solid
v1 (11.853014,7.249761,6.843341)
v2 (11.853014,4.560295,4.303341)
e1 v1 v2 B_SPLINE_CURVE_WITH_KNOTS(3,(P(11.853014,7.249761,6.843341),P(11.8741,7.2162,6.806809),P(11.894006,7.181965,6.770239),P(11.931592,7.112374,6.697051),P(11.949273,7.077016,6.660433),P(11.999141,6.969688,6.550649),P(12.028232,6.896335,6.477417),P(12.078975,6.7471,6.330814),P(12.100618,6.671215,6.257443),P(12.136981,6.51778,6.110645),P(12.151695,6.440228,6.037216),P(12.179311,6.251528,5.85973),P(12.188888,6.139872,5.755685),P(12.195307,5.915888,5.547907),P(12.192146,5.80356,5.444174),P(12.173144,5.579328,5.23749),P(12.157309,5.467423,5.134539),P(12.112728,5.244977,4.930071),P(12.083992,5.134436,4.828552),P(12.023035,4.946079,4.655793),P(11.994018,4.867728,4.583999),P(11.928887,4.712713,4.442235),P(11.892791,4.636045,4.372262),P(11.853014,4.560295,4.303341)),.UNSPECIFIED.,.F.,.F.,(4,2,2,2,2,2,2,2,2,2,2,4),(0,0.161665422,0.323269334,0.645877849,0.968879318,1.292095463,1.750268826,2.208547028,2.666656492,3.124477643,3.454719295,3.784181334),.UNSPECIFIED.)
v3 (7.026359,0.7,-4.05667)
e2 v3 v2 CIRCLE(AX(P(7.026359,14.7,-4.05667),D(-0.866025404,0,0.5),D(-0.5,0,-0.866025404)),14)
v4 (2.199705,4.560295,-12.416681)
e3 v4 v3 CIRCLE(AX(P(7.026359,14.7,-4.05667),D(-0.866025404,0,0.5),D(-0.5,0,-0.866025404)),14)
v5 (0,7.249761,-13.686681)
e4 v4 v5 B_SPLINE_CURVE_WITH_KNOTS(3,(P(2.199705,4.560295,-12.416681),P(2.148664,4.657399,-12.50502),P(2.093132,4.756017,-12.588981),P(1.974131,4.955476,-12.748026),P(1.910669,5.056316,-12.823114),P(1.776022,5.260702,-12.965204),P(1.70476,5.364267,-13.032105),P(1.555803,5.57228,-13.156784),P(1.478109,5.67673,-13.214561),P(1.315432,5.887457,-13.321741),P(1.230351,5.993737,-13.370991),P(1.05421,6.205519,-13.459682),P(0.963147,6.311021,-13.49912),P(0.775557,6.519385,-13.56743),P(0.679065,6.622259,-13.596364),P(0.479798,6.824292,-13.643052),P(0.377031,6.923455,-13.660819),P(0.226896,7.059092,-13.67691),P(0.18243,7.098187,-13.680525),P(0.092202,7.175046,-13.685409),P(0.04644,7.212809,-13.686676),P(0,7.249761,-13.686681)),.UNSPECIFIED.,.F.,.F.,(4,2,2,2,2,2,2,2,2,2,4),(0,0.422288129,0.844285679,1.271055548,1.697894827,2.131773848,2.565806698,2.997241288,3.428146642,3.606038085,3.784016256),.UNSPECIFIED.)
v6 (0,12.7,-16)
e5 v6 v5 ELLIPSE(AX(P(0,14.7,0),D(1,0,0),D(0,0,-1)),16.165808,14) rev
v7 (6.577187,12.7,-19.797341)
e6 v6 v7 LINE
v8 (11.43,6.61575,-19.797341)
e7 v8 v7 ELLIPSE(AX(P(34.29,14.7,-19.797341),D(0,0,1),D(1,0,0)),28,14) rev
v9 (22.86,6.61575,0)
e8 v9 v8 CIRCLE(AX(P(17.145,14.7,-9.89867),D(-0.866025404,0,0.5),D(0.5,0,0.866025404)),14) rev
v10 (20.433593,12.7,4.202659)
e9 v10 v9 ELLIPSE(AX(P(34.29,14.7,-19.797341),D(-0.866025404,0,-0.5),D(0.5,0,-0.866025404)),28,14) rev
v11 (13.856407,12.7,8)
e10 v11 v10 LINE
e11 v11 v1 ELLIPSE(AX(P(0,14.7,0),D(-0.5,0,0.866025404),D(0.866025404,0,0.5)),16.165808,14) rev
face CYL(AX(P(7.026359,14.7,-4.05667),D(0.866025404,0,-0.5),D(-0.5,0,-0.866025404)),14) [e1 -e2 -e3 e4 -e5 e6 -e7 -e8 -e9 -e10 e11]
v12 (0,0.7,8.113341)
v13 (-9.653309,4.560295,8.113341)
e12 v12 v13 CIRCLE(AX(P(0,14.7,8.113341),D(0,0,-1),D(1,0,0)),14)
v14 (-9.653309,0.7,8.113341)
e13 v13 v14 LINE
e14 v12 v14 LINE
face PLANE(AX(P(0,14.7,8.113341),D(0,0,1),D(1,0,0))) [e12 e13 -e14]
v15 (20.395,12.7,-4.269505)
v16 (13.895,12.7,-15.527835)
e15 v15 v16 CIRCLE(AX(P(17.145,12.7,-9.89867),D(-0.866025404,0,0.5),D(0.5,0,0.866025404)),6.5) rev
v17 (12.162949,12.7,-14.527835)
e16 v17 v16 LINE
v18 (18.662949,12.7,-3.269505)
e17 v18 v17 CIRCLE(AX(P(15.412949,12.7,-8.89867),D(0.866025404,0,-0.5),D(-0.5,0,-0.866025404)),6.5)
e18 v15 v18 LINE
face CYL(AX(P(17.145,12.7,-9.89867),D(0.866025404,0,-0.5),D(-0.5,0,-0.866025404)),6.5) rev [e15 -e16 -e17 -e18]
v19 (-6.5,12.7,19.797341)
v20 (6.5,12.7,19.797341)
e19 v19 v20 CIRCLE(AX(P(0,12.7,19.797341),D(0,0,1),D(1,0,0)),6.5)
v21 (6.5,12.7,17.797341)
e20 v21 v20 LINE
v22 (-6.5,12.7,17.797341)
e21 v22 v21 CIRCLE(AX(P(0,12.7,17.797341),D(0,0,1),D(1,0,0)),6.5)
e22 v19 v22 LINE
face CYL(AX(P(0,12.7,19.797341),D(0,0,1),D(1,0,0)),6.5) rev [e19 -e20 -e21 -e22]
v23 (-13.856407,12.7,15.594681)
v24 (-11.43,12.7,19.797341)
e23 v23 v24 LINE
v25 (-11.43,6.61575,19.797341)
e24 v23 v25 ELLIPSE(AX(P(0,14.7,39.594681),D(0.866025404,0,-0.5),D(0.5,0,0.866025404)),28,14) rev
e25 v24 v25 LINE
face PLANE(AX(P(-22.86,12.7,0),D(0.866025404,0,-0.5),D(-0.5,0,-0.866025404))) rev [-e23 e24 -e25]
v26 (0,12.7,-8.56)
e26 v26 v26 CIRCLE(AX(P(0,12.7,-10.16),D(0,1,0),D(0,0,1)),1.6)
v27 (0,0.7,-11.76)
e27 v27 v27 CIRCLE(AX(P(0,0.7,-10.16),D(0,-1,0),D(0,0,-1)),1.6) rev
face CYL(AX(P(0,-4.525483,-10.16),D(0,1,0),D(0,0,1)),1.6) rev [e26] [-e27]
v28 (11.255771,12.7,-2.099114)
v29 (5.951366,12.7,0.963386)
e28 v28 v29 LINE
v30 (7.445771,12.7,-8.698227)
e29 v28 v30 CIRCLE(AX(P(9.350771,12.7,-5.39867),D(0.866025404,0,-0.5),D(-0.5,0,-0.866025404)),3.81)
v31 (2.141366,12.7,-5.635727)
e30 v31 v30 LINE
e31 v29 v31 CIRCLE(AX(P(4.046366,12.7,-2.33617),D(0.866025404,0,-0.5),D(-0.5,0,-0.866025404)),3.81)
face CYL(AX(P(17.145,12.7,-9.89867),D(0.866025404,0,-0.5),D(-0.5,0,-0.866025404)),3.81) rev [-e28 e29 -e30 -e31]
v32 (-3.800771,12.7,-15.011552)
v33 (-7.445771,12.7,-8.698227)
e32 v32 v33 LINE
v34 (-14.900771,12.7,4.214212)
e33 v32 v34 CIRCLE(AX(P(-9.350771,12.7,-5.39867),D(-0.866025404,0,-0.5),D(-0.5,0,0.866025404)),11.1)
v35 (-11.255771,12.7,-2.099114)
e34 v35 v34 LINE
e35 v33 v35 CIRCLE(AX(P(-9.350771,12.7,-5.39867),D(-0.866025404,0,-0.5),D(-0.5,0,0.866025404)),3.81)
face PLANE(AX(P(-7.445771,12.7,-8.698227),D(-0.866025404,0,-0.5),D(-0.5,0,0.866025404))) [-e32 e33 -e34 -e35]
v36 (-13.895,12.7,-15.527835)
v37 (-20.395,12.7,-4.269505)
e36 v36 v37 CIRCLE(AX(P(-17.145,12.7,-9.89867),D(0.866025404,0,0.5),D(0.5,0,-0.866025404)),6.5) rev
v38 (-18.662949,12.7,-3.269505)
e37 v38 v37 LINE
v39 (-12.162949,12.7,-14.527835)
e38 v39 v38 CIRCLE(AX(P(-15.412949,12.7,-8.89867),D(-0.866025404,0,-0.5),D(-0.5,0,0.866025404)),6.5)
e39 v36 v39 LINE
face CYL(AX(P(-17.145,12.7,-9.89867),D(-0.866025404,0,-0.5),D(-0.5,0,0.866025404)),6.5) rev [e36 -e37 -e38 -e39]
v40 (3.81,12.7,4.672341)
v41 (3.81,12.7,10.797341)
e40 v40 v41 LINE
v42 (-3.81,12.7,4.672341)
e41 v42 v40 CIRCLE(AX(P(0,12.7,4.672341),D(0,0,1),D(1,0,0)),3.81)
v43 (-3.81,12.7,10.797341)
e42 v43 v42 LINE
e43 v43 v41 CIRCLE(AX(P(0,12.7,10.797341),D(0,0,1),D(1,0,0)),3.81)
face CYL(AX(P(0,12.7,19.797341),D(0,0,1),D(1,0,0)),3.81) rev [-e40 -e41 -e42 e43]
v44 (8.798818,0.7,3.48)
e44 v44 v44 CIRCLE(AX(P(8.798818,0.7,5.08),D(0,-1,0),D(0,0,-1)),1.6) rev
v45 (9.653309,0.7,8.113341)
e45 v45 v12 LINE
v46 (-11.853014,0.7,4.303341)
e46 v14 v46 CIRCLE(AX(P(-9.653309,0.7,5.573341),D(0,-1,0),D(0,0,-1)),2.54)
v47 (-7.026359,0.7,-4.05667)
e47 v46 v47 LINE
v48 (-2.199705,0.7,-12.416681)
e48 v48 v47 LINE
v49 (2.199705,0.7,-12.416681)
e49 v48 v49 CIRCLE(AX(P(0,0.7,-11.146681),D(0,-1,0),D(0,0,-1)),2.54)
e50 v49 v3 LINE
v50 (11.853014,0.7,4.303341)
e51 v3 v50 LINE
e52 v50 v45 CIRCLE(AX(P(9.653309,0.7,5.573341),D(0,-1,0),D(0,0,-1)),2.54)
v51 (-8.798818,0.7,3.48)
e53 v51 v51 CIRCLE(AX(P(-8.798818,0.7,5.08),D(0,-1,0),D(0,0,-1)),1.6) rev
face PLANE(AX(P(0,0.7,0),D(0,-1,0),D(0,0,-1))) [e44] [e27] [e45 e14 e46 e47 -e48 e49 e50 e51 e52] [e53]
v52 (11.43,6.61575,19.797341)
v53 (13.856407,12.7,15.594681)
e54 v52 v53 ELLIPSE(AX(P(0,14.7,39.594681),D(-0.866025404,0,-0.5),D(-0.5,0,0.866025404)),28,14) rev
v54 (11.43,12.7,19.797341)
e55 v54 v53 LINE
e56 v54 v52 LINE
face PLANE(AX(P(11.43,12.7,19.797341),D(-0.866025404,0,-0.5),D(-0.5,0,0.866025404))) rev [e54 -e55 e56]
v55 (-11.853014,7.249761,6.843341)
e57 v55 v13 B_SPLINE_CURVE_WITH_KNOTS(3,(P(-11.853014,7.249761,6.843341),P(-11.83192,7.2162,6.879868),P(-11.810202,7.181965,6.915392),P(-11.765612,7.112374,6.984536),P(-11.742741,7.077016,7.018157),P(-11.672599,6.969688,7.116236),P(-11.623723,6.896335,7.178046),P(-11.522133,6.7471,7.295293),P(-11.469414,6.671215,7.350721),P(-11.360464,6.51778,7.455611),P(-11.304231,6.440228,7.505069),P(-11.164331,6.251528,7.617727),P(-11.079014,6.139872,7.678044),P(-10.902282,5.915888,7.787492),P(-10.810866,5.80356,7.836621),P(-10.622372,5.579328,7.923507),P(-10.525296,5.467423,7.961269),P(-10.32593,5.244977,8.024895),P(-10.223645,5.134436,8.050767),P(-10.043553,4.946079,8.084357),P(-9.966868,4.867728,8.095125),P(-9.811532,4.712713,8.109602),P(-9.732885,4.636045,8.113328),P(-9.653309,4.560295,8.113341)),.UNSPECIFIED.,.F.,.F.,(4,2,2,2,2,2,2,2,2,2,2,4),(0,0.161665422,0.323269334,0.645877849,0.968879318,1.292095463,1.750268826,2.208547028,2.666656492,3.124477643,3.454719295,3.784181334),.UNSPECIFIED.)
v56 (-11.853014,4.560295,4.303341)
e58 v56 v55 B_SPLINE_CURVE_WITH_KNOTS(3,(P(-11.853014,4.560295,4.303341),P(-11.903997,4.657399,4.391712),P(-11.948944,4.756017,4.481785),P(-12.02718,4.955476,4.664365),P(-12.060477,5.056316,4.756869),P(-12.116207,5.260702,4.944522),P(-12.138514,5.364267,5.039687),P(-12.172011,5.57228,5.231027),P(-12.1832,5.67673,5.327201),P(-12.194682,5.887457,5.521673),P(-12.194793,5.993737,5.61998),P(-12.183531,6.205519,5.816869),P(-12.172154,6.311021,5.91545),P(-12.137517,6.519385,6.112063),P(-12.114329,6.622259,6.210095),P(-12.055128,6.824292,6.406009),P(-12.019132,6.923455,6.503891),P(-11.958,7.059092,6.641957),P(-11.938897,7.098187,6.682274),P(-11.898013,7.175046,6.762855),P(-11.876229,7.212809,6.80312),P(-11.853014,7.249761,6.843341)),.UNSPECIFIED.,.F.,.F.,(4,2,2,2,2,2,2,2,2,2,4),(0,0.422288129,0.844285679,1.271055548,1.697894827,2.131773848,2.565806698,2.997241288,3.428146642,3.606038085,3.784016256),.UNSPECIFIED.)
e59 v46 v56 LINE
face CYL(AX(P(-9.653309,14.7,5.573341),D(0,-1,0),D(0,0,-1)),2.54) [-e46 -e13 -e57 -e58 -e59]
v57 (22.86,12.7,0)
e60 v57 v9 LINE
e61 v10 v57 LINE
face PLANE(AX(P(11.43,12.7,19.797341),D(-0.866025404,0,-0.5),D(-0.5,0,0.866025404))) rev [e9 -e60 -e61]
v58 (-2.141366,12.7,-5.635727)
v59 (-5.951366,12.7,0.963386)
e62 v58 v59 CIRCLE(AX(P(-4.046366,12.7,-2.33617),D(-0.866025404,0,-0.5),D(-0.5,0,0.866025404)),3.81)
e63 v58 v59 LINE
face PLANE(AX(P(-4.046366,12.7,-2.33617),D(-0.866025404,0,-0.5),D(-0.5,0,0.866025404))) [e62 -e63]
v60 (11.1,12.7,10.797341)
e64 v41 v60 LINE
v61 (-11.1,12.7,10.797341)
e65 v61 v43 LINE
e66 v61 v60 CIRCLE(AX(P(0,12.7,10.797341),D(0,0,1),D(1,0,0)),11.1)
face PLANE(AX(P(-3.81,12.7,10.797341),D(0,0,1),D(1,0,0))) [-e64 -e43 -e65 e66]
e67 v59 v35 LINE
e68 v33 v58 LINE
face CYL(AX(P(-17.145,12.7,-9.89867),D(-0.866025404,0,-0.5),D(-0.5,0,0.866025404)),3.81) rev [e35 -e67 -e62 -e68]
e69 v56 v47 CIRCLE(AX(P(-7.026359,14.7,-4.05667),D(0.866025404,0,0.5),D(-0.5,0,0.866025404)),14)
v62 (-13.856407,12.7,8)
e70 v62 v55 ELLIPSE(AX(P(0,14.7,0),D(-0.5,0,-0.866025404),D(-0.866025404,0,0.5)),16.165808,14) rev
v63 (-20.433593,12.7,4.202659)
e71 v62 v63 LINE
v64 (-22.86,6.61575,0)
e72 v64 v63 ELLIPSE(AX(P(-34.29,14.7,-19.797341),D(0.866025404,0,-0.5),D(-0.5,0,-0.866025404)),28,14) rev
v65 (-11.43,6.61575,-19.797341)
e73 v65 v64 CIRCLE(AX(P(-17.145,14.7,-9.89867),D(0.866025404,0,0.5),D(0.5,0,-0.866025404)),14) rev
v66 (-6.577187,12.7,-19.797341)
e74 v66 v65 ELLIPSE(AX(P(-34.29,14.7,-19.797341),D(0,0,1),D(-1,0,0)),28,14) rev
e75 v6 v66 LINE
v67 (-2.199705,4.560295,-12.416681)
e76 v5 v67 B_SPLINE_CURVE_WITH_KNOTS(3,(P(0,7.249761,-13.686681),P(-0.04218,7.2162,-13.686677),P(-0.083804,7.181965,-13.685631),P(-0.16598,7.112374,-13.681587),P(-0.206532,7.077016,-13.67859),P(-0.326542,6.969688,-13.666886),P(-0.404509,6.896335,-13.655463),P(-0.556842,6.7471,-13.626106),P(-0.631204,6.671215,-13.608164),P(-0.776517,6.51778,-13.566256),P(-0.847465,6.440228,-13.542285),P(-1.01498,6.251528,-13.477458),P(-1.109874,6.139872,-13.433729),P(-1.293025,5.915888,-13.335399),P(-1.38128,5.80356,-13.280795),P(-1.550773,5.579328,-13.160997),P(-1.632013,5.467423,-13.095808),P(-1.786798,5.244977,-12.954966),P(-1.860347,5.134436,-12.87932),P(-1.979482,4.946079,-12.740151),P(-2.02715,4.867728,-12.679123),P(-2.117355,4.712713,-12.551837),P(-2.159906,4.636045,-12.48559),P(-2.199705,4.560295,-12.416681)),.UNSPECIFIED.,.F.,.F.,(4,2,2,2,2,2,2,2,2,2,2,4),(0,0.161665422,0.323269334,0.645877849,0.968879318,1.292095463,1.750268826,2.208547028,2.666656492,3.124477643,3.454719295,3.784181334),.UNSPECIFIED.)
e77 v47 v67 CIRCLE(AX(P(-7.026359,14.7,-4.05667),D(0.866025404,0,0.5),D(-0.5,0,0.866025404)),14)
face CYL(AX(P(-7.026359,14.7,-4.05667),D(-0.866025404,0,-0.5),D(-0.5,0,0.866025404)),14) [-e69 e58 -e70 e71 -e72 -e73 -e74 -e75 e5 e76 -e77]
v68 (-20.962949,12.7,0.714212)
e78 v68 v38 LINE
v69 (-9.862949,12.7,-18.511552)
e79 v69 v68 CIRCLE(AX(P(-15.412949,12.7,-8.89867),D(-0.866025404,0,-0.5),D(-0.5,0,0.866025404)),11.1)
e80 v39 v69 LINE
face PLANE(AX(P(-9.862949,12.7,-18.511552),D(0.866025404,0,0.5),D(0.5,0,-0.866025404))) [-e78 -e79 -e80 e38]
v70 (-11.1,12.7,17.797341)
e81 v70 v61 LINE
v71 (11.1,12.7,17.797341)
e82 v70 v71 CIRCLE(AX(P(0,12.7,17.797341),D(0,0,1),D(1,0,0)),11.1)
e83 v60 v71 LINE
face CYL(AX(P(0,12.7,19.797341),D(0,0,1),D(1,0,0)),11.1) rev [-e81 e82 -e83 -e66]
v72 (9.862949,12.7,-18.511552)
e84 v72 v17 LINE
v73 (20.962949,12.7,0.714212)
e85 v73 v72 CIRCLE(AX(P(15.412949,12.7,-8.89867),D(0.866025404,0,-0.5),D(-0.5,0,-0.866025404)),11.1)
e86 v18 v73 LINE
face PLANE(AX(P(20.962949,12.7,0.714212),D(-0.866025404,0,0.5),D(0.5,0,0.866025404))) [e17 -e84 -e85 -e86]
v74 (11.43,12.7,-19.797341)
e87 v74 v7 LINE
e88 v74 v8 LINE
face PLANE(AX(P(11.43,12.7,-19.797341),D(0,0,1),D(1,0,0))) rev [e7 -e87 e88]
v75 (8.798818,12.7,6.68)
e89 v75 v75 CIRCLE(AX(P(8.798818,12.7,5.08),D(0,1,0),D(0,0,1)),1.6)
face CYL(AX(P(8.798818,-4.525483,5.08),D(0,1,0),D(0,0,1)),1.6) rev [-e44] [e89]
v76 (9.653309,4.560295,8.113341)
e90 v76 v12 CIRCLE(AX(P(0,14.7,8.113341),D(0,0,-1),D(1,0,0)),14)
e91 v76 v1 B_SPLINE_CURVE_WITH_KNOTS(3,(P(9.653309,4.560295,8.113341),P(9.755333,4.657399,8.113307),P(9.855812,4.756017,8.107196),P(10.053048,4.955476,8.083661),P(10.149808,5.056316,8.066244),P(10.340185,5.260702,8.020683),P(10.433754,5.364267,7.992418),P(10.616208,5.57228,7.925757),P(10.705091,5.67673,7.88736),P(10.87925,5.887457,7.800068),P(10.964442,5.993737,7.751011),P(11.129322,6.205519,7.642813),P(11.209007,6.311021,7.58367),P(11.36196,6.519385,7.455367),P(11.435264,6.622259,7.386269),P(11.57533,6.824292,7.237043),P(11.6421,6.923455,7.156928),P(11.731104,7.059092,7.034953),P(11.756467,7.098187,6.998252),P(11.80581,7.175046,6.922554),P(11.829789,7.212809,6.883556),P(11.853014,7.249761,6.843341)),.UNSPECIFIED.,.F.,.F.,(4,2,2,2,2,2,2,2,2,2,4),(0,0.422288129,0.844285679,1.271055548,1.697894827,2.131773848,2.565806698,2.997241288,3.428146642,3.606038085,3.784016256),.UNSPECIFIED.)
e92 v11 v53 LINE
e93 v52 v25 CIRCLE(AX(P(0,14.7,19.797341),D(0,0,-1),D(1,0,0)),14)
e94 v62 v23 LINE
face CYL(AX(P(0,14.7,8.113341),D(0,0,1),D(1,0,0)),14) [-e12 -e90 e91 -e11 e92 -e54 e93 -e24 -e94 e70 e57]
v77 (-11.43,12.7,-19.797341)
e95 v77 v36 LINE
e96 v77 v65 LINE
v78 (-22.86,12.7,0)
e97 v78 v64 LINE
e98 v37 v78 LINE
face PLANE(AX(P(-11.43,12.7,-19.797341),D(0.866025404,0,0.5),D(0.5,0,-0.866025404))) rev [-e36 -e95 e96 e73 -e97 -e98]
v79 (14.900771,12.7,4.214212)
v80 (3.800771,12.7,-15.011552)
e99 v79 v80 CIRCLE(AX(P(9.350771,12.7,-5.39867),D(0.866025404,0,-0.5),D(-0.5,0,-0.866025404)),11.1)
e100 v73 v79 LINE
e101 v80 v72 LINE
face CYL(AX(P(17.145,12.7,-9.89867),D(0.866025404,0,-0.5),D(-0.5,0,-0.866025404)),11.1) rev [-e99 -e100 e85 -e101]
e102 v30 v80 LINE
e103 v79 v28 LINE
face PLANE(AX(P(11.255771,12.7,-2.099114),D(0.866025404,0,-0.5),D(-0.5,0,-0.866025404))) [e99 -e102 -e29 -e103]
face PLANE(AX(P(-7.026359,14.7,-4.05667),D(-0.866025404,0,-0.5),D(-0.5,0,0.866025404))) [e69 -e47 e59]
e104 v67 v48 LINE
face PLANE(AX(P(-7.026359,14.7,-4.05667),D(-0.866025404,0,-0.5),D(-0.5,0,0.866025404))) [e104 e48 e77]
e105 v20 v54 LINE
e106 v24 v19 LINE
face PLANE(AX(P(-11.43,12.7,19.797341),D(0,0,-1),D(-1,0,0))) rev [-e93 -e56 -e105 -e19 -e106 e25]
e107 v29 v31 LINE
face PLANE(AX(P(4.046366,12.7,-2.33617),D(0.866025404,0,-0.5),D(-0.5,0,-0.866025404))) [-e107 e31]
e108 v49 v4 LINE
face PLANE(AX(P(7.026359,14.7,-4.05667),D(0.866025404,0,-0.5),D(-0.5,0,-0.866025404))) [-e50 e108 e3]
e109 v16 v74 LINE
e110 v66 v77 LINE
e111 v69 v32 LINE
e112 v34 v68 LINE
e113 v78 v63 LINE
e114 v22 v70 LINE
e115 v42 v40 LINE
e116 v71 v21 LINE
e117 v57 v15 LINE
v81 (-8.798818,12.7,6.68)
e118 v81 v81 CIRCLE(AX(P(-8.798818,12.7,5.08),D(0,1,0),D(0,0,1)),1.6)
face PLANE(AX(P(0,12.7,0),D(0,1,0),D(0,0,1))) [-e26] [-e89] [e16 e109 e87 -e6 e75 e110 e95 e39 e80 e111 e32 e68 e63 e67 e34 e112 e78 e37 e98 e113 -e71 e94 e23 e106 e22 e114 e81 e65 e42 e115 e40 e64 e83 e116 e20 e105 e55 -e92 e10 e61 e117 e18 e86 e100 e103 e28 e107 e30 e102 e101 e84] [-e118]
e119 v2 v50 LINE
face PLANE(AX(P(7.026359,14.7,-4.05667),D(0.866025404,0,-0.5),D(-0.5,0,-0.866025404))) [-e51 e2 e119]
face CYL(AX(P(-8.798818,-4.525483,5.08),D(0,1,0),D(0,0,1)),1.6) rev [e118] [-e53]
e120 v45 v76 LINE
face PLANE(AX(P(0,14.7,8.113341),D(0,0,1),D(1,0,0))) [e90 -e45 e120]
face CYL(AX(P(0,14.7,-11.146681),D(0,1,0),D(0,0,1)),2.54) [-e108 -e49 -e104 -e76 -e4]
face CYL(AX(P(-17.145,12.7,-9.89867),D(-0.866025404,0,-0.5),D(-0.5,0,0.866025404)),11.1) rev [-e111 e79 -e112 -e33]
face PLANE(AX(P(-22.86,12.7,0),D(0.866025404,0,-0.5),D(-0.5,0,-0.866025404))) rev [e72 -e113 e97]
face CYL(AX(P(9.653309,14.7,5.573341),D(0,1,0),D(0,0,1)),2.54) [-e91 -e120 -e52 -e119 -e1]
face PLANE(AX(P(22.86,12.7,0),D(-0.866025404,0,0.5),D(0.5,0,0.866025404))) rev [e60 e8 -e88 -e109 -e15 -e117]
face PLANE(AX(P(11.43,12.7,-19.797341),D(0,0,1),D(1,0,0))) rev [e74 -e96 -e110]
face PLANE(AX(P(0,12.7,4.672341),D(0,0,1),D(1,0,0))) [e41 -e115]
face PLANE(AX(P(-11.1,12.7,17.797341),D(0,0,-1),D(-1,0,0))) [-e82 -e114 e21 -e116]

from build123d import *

# Parameters (mm, degrees)
BOSS_EXTRUDE1_DEPTH = 12.7
SKETCH7_R           = 1.6
CUT_EXTRUDE2_DEPTH  = 12.7
CIRPATTERN1_COUNT   = 3
CUT_EXTRUDE3_DEPTH  = 11.684
CIRPATTERN2_COUNT   = 3
CUT_EXTRUDE5_DEPTH  = 0.7
FILLET2_R           = 2.54


with BuildPart() as part:
    # Sketch1 → Boss-Extrude1 (new body)
    with BuildSketch(Plane(origin=(0, 0, 0), x_dir=(1, 0, 0), z_dir=(0, 1, 0))):
        Polygon((11.43, -19.797340731), (22.86, 0), (11.43, 19.797340731), (-11.43, 19.797340731), (-22.86, 0), (-11.43, -19.797340731), align=None)
    extrude(amount=BOSS_EXTRUDE1_DEPTH)

    # Sketch5 → Cut-Revolve1 (revolve, cut)
    with BuildSketch(Plane(origin=(0, 12.7, 0), x_dir=(1, 0, 0), z_dir=(0, 1, 0))):
        Polygon((0, -19.797340731), (0, -4.672340739), (-3.81, -4.672340739), (-3.81, -10.797340731), (-11.100000152, -10.797340731), (-11.100000152, -17.797340731), (-6.5, -17.797340731), (-6.5, -19.797340731), align=None)
    cut_revolve1 = revolve(axis=Axis((0, 12.7, 19.797340731), (0, 0, -1)), mode=Mode.SUBTRACT)

    # Sketch7 → Cut-Extrude2 (cut)
    with BuildSketch(Plane(origin=(0, 12.7, 0), x_dir=(1, 0, 0), z_dir=(0, 1, 0))):
        with Locations(Location((0, 10.16, 0), (0, 0, 270))):
            Circle(SKETCH7_R)
        with Locations(Location((8.798818102, -5.08, 0), (0, 0, 270))):
            Circle(SKETCH7_R)
        with Locations(Location((-8.798818102, -5.08, 0), (0, 0, 270))):
            Circle(SKETCH7_R)
    extrude(amount=-CUT_EXTRUDE2_DEPTH, mode=Mode.SUBTRACT)

    # CirPattern1: Cut-Revolve1 ×3 about axis
    cirpattern1_axis = Axis((0, 0, 0), (0, 1, 0))
    for i in range(1, CIRPATTERN1_COUNT):
        add(cut_revolve1.rotate(cirpattern1_axis, i * 360 / CIRPATTERN1_COUNT), mode=Mode.SUBTRACT)

    # Sketch8 → Cut-Extrude3 (cut)
    with BuildSketch(Plane.XY.offset(19.797340731)):
        with BuildLine():
            Line((-13.856406592, 12.7), (-18.662949192, 12.7))
            Line((-18.662949192, 12.7), (-18.662949192, 0))
            Line((-18.662949192, 0), (18.662949192, 0))
            Line((18.662949192, 0), (18.662949192, 12.7))
            Line((18.662949192, 12.7), (13.856406592, 12.7))
            ThreePointArc((13.856406592, 12.7), (0, 0.69999987), (-13.856406592, 12.7))
        make_face()
    cut_extrude3 = extrude(amount=-CUT_EXTRUDE3_DEPTH, mode=Mode.SUBTRACT)

    # CirPattern2: Cut-Extrude3 ×3 about axis
    cirpattern2_axis = Axis((0, 0, 0), (0, 1, 0))
    for i in range(1, CIRPATTERN2_COUNT):
        add(cut_extrude3.rotate(cirpattern2_axis, i * 360 / CIRPATTERN2_COUNT), mode=Mode.SUBTRACT)

    # Sketch10 → Cut-Extrude5 (cut)
    with BuildSketch(Plane.XZ):
        Polygon((14.052718364, 8.113340731), (-14.052718364, 8.113340731), (0, -16.226681461), align=None)
    extrude(amount=-CUT_EXTRUDE5_DEPTH, mode=Mode.SUBTRACT)

    # Fillet2
    # the kernel refuses this fillet: 2.54 mm, written as the material it takes off along each edge
    with BuildSketch(Plane(origin=(14.052718364, -10.298522628, 8.113340731), x_dir=(-0.4999999999999996, 0, -0.8660254037844387), z_dir=(0, 1, 0))) as fillet2_piece_1_section:
        with BuildLine():
            CenterArc((FILLET2_R * 1.73205080757, FILLET2_R), FILLET2_R, 150, 120)
            Line((FILLET2_R * 0.866025403784, FILLET2_R * 1.5), (0, 0))
            Line((0, 0), (FILLET2_R * 1.73205080757, 0))
        make_face()
    fillet2_piece_1 = extrude(amount=33.997045256, mode=Mode.PRIVATE)
    fillet2_piece_1 = fillet2_piece_1 - Plane(origin=(6.277314066, 14.7, -3.624208966), x_dir=(-0.49487165940112743, -0.14285714153061227, -0.8571428573086736), z_dir=(0.8660254037844388, 0, -0.49999999999999983)) * Cylinder(14.00000013, 86, mode=Mode.PRIVATE)
    fillet2_piece_1 = fillet2_piece_1 - Plane(origin=(0, 14.7, 7.248417919), x_dir=(0.9897433188022552, -0.14285714153061224, 0), z_dir=(0, 0, 1)) * Cylinder(14.00000013, 86, mode=Mode.PRIVATE)
    add(fillet2_piece_1, mode=Mode.SUBTRACT)
    with BuildSketch(Plane(origin=(0, -10.298522628, -16.226681461), x_dir=(-0.5000000000000003, 0, 0.8660254037844386), z_dir=(0, 1, 0))) as fillet2_piece_2_section:
        with BuildLine():
            CenterArc((FILLET2_R * 1.73205080757, FILLET2_R), FILLET2_R, 150, 120)
            Line((FILLET2_R * 0.866025403784, FILLET2_R * 1.5), (0, 0))
            Line((0, 0), (FILLET2_R * 1.73205080757, 0))
        make_face()
    fillet2_piece_2 = extrude(amount=33.997045256, mode=Mode.PRIVATE)
    fillet2_piece_2 = fillet2_piece_2 - Plane(origin=(6.277314055, 14.7, -3.62420896), x_dir=(-0.49487165940112743, -0.14285714153061227, -0.8571428573086736), z_dir=(0.8660254037844388, 0, -0.49999999999999983)) * Cylinder(14.00000013, 86, mode=Mode.PRIVATE)
    fillet2_piece_2 = fillet2_piece_2 - Plane(origin=(-6.277314066, 14.7, -3.624208966), x_dir=(-0.4948716594011281, -0.14285714153061227, 0.8571428573086732), z_dir=(-0.8660254037844384, 0, -0.5000000000000004)) * Cylinder(14.00000013, 86, mode=Mode.PRIVATE)
    add(fillet2_piece_2, mode=Mode.SUBTRACT)
    with BuildSketch(Plane(origin=(-14.052718364, 23.698522628, 8.113340731), x_dir=(1, 0, 0), z_dir=(0, -1, 0))) as fillet2_piece_3_section:
        with BuildLine():
            CenterArc((FILLET2_R * 1.73205080757, -FILLET2_R), FILLET2_R, 90, 120)
            Line((FILLET2_R * 0.866025403784, -FILLET2_R * 1.5), (0, 0))
            Line((0, 0), (FILLET2_R * 1.73205080757, 0))
        make_face()
    fillet2_piece_3 = extrude(amount=33.997045256, mode=Mode.PRIVATE)
    fillet2_piece_3 = fillet2_piece_3 - Plane(origin=(0, 14.7, 7.248417932), x_dir=(0.9897433188022552, -0.14285714153061224, 0), z_dir=(0, 0, 1)) * Cylinder(14.00000013, 86, mode=Mode.PRIVATE)
    fillet2_piece_3 = fillet2_piece_3 - Plane(origin=(-6.277314055, 14.7, -3.62420896), x_dir=(-0.4948716594011281, -0.14285714153061227, 0.8571428573086732), z_dir=(-0.8660254037844384, 0, -0.5000000000000004)) * Cylinder(14.00000013, 86, mode=Mode.PRIVATE)
    add(fillet2_piece_3, mode=Mode.SUBTRACT)


solid = part.part
